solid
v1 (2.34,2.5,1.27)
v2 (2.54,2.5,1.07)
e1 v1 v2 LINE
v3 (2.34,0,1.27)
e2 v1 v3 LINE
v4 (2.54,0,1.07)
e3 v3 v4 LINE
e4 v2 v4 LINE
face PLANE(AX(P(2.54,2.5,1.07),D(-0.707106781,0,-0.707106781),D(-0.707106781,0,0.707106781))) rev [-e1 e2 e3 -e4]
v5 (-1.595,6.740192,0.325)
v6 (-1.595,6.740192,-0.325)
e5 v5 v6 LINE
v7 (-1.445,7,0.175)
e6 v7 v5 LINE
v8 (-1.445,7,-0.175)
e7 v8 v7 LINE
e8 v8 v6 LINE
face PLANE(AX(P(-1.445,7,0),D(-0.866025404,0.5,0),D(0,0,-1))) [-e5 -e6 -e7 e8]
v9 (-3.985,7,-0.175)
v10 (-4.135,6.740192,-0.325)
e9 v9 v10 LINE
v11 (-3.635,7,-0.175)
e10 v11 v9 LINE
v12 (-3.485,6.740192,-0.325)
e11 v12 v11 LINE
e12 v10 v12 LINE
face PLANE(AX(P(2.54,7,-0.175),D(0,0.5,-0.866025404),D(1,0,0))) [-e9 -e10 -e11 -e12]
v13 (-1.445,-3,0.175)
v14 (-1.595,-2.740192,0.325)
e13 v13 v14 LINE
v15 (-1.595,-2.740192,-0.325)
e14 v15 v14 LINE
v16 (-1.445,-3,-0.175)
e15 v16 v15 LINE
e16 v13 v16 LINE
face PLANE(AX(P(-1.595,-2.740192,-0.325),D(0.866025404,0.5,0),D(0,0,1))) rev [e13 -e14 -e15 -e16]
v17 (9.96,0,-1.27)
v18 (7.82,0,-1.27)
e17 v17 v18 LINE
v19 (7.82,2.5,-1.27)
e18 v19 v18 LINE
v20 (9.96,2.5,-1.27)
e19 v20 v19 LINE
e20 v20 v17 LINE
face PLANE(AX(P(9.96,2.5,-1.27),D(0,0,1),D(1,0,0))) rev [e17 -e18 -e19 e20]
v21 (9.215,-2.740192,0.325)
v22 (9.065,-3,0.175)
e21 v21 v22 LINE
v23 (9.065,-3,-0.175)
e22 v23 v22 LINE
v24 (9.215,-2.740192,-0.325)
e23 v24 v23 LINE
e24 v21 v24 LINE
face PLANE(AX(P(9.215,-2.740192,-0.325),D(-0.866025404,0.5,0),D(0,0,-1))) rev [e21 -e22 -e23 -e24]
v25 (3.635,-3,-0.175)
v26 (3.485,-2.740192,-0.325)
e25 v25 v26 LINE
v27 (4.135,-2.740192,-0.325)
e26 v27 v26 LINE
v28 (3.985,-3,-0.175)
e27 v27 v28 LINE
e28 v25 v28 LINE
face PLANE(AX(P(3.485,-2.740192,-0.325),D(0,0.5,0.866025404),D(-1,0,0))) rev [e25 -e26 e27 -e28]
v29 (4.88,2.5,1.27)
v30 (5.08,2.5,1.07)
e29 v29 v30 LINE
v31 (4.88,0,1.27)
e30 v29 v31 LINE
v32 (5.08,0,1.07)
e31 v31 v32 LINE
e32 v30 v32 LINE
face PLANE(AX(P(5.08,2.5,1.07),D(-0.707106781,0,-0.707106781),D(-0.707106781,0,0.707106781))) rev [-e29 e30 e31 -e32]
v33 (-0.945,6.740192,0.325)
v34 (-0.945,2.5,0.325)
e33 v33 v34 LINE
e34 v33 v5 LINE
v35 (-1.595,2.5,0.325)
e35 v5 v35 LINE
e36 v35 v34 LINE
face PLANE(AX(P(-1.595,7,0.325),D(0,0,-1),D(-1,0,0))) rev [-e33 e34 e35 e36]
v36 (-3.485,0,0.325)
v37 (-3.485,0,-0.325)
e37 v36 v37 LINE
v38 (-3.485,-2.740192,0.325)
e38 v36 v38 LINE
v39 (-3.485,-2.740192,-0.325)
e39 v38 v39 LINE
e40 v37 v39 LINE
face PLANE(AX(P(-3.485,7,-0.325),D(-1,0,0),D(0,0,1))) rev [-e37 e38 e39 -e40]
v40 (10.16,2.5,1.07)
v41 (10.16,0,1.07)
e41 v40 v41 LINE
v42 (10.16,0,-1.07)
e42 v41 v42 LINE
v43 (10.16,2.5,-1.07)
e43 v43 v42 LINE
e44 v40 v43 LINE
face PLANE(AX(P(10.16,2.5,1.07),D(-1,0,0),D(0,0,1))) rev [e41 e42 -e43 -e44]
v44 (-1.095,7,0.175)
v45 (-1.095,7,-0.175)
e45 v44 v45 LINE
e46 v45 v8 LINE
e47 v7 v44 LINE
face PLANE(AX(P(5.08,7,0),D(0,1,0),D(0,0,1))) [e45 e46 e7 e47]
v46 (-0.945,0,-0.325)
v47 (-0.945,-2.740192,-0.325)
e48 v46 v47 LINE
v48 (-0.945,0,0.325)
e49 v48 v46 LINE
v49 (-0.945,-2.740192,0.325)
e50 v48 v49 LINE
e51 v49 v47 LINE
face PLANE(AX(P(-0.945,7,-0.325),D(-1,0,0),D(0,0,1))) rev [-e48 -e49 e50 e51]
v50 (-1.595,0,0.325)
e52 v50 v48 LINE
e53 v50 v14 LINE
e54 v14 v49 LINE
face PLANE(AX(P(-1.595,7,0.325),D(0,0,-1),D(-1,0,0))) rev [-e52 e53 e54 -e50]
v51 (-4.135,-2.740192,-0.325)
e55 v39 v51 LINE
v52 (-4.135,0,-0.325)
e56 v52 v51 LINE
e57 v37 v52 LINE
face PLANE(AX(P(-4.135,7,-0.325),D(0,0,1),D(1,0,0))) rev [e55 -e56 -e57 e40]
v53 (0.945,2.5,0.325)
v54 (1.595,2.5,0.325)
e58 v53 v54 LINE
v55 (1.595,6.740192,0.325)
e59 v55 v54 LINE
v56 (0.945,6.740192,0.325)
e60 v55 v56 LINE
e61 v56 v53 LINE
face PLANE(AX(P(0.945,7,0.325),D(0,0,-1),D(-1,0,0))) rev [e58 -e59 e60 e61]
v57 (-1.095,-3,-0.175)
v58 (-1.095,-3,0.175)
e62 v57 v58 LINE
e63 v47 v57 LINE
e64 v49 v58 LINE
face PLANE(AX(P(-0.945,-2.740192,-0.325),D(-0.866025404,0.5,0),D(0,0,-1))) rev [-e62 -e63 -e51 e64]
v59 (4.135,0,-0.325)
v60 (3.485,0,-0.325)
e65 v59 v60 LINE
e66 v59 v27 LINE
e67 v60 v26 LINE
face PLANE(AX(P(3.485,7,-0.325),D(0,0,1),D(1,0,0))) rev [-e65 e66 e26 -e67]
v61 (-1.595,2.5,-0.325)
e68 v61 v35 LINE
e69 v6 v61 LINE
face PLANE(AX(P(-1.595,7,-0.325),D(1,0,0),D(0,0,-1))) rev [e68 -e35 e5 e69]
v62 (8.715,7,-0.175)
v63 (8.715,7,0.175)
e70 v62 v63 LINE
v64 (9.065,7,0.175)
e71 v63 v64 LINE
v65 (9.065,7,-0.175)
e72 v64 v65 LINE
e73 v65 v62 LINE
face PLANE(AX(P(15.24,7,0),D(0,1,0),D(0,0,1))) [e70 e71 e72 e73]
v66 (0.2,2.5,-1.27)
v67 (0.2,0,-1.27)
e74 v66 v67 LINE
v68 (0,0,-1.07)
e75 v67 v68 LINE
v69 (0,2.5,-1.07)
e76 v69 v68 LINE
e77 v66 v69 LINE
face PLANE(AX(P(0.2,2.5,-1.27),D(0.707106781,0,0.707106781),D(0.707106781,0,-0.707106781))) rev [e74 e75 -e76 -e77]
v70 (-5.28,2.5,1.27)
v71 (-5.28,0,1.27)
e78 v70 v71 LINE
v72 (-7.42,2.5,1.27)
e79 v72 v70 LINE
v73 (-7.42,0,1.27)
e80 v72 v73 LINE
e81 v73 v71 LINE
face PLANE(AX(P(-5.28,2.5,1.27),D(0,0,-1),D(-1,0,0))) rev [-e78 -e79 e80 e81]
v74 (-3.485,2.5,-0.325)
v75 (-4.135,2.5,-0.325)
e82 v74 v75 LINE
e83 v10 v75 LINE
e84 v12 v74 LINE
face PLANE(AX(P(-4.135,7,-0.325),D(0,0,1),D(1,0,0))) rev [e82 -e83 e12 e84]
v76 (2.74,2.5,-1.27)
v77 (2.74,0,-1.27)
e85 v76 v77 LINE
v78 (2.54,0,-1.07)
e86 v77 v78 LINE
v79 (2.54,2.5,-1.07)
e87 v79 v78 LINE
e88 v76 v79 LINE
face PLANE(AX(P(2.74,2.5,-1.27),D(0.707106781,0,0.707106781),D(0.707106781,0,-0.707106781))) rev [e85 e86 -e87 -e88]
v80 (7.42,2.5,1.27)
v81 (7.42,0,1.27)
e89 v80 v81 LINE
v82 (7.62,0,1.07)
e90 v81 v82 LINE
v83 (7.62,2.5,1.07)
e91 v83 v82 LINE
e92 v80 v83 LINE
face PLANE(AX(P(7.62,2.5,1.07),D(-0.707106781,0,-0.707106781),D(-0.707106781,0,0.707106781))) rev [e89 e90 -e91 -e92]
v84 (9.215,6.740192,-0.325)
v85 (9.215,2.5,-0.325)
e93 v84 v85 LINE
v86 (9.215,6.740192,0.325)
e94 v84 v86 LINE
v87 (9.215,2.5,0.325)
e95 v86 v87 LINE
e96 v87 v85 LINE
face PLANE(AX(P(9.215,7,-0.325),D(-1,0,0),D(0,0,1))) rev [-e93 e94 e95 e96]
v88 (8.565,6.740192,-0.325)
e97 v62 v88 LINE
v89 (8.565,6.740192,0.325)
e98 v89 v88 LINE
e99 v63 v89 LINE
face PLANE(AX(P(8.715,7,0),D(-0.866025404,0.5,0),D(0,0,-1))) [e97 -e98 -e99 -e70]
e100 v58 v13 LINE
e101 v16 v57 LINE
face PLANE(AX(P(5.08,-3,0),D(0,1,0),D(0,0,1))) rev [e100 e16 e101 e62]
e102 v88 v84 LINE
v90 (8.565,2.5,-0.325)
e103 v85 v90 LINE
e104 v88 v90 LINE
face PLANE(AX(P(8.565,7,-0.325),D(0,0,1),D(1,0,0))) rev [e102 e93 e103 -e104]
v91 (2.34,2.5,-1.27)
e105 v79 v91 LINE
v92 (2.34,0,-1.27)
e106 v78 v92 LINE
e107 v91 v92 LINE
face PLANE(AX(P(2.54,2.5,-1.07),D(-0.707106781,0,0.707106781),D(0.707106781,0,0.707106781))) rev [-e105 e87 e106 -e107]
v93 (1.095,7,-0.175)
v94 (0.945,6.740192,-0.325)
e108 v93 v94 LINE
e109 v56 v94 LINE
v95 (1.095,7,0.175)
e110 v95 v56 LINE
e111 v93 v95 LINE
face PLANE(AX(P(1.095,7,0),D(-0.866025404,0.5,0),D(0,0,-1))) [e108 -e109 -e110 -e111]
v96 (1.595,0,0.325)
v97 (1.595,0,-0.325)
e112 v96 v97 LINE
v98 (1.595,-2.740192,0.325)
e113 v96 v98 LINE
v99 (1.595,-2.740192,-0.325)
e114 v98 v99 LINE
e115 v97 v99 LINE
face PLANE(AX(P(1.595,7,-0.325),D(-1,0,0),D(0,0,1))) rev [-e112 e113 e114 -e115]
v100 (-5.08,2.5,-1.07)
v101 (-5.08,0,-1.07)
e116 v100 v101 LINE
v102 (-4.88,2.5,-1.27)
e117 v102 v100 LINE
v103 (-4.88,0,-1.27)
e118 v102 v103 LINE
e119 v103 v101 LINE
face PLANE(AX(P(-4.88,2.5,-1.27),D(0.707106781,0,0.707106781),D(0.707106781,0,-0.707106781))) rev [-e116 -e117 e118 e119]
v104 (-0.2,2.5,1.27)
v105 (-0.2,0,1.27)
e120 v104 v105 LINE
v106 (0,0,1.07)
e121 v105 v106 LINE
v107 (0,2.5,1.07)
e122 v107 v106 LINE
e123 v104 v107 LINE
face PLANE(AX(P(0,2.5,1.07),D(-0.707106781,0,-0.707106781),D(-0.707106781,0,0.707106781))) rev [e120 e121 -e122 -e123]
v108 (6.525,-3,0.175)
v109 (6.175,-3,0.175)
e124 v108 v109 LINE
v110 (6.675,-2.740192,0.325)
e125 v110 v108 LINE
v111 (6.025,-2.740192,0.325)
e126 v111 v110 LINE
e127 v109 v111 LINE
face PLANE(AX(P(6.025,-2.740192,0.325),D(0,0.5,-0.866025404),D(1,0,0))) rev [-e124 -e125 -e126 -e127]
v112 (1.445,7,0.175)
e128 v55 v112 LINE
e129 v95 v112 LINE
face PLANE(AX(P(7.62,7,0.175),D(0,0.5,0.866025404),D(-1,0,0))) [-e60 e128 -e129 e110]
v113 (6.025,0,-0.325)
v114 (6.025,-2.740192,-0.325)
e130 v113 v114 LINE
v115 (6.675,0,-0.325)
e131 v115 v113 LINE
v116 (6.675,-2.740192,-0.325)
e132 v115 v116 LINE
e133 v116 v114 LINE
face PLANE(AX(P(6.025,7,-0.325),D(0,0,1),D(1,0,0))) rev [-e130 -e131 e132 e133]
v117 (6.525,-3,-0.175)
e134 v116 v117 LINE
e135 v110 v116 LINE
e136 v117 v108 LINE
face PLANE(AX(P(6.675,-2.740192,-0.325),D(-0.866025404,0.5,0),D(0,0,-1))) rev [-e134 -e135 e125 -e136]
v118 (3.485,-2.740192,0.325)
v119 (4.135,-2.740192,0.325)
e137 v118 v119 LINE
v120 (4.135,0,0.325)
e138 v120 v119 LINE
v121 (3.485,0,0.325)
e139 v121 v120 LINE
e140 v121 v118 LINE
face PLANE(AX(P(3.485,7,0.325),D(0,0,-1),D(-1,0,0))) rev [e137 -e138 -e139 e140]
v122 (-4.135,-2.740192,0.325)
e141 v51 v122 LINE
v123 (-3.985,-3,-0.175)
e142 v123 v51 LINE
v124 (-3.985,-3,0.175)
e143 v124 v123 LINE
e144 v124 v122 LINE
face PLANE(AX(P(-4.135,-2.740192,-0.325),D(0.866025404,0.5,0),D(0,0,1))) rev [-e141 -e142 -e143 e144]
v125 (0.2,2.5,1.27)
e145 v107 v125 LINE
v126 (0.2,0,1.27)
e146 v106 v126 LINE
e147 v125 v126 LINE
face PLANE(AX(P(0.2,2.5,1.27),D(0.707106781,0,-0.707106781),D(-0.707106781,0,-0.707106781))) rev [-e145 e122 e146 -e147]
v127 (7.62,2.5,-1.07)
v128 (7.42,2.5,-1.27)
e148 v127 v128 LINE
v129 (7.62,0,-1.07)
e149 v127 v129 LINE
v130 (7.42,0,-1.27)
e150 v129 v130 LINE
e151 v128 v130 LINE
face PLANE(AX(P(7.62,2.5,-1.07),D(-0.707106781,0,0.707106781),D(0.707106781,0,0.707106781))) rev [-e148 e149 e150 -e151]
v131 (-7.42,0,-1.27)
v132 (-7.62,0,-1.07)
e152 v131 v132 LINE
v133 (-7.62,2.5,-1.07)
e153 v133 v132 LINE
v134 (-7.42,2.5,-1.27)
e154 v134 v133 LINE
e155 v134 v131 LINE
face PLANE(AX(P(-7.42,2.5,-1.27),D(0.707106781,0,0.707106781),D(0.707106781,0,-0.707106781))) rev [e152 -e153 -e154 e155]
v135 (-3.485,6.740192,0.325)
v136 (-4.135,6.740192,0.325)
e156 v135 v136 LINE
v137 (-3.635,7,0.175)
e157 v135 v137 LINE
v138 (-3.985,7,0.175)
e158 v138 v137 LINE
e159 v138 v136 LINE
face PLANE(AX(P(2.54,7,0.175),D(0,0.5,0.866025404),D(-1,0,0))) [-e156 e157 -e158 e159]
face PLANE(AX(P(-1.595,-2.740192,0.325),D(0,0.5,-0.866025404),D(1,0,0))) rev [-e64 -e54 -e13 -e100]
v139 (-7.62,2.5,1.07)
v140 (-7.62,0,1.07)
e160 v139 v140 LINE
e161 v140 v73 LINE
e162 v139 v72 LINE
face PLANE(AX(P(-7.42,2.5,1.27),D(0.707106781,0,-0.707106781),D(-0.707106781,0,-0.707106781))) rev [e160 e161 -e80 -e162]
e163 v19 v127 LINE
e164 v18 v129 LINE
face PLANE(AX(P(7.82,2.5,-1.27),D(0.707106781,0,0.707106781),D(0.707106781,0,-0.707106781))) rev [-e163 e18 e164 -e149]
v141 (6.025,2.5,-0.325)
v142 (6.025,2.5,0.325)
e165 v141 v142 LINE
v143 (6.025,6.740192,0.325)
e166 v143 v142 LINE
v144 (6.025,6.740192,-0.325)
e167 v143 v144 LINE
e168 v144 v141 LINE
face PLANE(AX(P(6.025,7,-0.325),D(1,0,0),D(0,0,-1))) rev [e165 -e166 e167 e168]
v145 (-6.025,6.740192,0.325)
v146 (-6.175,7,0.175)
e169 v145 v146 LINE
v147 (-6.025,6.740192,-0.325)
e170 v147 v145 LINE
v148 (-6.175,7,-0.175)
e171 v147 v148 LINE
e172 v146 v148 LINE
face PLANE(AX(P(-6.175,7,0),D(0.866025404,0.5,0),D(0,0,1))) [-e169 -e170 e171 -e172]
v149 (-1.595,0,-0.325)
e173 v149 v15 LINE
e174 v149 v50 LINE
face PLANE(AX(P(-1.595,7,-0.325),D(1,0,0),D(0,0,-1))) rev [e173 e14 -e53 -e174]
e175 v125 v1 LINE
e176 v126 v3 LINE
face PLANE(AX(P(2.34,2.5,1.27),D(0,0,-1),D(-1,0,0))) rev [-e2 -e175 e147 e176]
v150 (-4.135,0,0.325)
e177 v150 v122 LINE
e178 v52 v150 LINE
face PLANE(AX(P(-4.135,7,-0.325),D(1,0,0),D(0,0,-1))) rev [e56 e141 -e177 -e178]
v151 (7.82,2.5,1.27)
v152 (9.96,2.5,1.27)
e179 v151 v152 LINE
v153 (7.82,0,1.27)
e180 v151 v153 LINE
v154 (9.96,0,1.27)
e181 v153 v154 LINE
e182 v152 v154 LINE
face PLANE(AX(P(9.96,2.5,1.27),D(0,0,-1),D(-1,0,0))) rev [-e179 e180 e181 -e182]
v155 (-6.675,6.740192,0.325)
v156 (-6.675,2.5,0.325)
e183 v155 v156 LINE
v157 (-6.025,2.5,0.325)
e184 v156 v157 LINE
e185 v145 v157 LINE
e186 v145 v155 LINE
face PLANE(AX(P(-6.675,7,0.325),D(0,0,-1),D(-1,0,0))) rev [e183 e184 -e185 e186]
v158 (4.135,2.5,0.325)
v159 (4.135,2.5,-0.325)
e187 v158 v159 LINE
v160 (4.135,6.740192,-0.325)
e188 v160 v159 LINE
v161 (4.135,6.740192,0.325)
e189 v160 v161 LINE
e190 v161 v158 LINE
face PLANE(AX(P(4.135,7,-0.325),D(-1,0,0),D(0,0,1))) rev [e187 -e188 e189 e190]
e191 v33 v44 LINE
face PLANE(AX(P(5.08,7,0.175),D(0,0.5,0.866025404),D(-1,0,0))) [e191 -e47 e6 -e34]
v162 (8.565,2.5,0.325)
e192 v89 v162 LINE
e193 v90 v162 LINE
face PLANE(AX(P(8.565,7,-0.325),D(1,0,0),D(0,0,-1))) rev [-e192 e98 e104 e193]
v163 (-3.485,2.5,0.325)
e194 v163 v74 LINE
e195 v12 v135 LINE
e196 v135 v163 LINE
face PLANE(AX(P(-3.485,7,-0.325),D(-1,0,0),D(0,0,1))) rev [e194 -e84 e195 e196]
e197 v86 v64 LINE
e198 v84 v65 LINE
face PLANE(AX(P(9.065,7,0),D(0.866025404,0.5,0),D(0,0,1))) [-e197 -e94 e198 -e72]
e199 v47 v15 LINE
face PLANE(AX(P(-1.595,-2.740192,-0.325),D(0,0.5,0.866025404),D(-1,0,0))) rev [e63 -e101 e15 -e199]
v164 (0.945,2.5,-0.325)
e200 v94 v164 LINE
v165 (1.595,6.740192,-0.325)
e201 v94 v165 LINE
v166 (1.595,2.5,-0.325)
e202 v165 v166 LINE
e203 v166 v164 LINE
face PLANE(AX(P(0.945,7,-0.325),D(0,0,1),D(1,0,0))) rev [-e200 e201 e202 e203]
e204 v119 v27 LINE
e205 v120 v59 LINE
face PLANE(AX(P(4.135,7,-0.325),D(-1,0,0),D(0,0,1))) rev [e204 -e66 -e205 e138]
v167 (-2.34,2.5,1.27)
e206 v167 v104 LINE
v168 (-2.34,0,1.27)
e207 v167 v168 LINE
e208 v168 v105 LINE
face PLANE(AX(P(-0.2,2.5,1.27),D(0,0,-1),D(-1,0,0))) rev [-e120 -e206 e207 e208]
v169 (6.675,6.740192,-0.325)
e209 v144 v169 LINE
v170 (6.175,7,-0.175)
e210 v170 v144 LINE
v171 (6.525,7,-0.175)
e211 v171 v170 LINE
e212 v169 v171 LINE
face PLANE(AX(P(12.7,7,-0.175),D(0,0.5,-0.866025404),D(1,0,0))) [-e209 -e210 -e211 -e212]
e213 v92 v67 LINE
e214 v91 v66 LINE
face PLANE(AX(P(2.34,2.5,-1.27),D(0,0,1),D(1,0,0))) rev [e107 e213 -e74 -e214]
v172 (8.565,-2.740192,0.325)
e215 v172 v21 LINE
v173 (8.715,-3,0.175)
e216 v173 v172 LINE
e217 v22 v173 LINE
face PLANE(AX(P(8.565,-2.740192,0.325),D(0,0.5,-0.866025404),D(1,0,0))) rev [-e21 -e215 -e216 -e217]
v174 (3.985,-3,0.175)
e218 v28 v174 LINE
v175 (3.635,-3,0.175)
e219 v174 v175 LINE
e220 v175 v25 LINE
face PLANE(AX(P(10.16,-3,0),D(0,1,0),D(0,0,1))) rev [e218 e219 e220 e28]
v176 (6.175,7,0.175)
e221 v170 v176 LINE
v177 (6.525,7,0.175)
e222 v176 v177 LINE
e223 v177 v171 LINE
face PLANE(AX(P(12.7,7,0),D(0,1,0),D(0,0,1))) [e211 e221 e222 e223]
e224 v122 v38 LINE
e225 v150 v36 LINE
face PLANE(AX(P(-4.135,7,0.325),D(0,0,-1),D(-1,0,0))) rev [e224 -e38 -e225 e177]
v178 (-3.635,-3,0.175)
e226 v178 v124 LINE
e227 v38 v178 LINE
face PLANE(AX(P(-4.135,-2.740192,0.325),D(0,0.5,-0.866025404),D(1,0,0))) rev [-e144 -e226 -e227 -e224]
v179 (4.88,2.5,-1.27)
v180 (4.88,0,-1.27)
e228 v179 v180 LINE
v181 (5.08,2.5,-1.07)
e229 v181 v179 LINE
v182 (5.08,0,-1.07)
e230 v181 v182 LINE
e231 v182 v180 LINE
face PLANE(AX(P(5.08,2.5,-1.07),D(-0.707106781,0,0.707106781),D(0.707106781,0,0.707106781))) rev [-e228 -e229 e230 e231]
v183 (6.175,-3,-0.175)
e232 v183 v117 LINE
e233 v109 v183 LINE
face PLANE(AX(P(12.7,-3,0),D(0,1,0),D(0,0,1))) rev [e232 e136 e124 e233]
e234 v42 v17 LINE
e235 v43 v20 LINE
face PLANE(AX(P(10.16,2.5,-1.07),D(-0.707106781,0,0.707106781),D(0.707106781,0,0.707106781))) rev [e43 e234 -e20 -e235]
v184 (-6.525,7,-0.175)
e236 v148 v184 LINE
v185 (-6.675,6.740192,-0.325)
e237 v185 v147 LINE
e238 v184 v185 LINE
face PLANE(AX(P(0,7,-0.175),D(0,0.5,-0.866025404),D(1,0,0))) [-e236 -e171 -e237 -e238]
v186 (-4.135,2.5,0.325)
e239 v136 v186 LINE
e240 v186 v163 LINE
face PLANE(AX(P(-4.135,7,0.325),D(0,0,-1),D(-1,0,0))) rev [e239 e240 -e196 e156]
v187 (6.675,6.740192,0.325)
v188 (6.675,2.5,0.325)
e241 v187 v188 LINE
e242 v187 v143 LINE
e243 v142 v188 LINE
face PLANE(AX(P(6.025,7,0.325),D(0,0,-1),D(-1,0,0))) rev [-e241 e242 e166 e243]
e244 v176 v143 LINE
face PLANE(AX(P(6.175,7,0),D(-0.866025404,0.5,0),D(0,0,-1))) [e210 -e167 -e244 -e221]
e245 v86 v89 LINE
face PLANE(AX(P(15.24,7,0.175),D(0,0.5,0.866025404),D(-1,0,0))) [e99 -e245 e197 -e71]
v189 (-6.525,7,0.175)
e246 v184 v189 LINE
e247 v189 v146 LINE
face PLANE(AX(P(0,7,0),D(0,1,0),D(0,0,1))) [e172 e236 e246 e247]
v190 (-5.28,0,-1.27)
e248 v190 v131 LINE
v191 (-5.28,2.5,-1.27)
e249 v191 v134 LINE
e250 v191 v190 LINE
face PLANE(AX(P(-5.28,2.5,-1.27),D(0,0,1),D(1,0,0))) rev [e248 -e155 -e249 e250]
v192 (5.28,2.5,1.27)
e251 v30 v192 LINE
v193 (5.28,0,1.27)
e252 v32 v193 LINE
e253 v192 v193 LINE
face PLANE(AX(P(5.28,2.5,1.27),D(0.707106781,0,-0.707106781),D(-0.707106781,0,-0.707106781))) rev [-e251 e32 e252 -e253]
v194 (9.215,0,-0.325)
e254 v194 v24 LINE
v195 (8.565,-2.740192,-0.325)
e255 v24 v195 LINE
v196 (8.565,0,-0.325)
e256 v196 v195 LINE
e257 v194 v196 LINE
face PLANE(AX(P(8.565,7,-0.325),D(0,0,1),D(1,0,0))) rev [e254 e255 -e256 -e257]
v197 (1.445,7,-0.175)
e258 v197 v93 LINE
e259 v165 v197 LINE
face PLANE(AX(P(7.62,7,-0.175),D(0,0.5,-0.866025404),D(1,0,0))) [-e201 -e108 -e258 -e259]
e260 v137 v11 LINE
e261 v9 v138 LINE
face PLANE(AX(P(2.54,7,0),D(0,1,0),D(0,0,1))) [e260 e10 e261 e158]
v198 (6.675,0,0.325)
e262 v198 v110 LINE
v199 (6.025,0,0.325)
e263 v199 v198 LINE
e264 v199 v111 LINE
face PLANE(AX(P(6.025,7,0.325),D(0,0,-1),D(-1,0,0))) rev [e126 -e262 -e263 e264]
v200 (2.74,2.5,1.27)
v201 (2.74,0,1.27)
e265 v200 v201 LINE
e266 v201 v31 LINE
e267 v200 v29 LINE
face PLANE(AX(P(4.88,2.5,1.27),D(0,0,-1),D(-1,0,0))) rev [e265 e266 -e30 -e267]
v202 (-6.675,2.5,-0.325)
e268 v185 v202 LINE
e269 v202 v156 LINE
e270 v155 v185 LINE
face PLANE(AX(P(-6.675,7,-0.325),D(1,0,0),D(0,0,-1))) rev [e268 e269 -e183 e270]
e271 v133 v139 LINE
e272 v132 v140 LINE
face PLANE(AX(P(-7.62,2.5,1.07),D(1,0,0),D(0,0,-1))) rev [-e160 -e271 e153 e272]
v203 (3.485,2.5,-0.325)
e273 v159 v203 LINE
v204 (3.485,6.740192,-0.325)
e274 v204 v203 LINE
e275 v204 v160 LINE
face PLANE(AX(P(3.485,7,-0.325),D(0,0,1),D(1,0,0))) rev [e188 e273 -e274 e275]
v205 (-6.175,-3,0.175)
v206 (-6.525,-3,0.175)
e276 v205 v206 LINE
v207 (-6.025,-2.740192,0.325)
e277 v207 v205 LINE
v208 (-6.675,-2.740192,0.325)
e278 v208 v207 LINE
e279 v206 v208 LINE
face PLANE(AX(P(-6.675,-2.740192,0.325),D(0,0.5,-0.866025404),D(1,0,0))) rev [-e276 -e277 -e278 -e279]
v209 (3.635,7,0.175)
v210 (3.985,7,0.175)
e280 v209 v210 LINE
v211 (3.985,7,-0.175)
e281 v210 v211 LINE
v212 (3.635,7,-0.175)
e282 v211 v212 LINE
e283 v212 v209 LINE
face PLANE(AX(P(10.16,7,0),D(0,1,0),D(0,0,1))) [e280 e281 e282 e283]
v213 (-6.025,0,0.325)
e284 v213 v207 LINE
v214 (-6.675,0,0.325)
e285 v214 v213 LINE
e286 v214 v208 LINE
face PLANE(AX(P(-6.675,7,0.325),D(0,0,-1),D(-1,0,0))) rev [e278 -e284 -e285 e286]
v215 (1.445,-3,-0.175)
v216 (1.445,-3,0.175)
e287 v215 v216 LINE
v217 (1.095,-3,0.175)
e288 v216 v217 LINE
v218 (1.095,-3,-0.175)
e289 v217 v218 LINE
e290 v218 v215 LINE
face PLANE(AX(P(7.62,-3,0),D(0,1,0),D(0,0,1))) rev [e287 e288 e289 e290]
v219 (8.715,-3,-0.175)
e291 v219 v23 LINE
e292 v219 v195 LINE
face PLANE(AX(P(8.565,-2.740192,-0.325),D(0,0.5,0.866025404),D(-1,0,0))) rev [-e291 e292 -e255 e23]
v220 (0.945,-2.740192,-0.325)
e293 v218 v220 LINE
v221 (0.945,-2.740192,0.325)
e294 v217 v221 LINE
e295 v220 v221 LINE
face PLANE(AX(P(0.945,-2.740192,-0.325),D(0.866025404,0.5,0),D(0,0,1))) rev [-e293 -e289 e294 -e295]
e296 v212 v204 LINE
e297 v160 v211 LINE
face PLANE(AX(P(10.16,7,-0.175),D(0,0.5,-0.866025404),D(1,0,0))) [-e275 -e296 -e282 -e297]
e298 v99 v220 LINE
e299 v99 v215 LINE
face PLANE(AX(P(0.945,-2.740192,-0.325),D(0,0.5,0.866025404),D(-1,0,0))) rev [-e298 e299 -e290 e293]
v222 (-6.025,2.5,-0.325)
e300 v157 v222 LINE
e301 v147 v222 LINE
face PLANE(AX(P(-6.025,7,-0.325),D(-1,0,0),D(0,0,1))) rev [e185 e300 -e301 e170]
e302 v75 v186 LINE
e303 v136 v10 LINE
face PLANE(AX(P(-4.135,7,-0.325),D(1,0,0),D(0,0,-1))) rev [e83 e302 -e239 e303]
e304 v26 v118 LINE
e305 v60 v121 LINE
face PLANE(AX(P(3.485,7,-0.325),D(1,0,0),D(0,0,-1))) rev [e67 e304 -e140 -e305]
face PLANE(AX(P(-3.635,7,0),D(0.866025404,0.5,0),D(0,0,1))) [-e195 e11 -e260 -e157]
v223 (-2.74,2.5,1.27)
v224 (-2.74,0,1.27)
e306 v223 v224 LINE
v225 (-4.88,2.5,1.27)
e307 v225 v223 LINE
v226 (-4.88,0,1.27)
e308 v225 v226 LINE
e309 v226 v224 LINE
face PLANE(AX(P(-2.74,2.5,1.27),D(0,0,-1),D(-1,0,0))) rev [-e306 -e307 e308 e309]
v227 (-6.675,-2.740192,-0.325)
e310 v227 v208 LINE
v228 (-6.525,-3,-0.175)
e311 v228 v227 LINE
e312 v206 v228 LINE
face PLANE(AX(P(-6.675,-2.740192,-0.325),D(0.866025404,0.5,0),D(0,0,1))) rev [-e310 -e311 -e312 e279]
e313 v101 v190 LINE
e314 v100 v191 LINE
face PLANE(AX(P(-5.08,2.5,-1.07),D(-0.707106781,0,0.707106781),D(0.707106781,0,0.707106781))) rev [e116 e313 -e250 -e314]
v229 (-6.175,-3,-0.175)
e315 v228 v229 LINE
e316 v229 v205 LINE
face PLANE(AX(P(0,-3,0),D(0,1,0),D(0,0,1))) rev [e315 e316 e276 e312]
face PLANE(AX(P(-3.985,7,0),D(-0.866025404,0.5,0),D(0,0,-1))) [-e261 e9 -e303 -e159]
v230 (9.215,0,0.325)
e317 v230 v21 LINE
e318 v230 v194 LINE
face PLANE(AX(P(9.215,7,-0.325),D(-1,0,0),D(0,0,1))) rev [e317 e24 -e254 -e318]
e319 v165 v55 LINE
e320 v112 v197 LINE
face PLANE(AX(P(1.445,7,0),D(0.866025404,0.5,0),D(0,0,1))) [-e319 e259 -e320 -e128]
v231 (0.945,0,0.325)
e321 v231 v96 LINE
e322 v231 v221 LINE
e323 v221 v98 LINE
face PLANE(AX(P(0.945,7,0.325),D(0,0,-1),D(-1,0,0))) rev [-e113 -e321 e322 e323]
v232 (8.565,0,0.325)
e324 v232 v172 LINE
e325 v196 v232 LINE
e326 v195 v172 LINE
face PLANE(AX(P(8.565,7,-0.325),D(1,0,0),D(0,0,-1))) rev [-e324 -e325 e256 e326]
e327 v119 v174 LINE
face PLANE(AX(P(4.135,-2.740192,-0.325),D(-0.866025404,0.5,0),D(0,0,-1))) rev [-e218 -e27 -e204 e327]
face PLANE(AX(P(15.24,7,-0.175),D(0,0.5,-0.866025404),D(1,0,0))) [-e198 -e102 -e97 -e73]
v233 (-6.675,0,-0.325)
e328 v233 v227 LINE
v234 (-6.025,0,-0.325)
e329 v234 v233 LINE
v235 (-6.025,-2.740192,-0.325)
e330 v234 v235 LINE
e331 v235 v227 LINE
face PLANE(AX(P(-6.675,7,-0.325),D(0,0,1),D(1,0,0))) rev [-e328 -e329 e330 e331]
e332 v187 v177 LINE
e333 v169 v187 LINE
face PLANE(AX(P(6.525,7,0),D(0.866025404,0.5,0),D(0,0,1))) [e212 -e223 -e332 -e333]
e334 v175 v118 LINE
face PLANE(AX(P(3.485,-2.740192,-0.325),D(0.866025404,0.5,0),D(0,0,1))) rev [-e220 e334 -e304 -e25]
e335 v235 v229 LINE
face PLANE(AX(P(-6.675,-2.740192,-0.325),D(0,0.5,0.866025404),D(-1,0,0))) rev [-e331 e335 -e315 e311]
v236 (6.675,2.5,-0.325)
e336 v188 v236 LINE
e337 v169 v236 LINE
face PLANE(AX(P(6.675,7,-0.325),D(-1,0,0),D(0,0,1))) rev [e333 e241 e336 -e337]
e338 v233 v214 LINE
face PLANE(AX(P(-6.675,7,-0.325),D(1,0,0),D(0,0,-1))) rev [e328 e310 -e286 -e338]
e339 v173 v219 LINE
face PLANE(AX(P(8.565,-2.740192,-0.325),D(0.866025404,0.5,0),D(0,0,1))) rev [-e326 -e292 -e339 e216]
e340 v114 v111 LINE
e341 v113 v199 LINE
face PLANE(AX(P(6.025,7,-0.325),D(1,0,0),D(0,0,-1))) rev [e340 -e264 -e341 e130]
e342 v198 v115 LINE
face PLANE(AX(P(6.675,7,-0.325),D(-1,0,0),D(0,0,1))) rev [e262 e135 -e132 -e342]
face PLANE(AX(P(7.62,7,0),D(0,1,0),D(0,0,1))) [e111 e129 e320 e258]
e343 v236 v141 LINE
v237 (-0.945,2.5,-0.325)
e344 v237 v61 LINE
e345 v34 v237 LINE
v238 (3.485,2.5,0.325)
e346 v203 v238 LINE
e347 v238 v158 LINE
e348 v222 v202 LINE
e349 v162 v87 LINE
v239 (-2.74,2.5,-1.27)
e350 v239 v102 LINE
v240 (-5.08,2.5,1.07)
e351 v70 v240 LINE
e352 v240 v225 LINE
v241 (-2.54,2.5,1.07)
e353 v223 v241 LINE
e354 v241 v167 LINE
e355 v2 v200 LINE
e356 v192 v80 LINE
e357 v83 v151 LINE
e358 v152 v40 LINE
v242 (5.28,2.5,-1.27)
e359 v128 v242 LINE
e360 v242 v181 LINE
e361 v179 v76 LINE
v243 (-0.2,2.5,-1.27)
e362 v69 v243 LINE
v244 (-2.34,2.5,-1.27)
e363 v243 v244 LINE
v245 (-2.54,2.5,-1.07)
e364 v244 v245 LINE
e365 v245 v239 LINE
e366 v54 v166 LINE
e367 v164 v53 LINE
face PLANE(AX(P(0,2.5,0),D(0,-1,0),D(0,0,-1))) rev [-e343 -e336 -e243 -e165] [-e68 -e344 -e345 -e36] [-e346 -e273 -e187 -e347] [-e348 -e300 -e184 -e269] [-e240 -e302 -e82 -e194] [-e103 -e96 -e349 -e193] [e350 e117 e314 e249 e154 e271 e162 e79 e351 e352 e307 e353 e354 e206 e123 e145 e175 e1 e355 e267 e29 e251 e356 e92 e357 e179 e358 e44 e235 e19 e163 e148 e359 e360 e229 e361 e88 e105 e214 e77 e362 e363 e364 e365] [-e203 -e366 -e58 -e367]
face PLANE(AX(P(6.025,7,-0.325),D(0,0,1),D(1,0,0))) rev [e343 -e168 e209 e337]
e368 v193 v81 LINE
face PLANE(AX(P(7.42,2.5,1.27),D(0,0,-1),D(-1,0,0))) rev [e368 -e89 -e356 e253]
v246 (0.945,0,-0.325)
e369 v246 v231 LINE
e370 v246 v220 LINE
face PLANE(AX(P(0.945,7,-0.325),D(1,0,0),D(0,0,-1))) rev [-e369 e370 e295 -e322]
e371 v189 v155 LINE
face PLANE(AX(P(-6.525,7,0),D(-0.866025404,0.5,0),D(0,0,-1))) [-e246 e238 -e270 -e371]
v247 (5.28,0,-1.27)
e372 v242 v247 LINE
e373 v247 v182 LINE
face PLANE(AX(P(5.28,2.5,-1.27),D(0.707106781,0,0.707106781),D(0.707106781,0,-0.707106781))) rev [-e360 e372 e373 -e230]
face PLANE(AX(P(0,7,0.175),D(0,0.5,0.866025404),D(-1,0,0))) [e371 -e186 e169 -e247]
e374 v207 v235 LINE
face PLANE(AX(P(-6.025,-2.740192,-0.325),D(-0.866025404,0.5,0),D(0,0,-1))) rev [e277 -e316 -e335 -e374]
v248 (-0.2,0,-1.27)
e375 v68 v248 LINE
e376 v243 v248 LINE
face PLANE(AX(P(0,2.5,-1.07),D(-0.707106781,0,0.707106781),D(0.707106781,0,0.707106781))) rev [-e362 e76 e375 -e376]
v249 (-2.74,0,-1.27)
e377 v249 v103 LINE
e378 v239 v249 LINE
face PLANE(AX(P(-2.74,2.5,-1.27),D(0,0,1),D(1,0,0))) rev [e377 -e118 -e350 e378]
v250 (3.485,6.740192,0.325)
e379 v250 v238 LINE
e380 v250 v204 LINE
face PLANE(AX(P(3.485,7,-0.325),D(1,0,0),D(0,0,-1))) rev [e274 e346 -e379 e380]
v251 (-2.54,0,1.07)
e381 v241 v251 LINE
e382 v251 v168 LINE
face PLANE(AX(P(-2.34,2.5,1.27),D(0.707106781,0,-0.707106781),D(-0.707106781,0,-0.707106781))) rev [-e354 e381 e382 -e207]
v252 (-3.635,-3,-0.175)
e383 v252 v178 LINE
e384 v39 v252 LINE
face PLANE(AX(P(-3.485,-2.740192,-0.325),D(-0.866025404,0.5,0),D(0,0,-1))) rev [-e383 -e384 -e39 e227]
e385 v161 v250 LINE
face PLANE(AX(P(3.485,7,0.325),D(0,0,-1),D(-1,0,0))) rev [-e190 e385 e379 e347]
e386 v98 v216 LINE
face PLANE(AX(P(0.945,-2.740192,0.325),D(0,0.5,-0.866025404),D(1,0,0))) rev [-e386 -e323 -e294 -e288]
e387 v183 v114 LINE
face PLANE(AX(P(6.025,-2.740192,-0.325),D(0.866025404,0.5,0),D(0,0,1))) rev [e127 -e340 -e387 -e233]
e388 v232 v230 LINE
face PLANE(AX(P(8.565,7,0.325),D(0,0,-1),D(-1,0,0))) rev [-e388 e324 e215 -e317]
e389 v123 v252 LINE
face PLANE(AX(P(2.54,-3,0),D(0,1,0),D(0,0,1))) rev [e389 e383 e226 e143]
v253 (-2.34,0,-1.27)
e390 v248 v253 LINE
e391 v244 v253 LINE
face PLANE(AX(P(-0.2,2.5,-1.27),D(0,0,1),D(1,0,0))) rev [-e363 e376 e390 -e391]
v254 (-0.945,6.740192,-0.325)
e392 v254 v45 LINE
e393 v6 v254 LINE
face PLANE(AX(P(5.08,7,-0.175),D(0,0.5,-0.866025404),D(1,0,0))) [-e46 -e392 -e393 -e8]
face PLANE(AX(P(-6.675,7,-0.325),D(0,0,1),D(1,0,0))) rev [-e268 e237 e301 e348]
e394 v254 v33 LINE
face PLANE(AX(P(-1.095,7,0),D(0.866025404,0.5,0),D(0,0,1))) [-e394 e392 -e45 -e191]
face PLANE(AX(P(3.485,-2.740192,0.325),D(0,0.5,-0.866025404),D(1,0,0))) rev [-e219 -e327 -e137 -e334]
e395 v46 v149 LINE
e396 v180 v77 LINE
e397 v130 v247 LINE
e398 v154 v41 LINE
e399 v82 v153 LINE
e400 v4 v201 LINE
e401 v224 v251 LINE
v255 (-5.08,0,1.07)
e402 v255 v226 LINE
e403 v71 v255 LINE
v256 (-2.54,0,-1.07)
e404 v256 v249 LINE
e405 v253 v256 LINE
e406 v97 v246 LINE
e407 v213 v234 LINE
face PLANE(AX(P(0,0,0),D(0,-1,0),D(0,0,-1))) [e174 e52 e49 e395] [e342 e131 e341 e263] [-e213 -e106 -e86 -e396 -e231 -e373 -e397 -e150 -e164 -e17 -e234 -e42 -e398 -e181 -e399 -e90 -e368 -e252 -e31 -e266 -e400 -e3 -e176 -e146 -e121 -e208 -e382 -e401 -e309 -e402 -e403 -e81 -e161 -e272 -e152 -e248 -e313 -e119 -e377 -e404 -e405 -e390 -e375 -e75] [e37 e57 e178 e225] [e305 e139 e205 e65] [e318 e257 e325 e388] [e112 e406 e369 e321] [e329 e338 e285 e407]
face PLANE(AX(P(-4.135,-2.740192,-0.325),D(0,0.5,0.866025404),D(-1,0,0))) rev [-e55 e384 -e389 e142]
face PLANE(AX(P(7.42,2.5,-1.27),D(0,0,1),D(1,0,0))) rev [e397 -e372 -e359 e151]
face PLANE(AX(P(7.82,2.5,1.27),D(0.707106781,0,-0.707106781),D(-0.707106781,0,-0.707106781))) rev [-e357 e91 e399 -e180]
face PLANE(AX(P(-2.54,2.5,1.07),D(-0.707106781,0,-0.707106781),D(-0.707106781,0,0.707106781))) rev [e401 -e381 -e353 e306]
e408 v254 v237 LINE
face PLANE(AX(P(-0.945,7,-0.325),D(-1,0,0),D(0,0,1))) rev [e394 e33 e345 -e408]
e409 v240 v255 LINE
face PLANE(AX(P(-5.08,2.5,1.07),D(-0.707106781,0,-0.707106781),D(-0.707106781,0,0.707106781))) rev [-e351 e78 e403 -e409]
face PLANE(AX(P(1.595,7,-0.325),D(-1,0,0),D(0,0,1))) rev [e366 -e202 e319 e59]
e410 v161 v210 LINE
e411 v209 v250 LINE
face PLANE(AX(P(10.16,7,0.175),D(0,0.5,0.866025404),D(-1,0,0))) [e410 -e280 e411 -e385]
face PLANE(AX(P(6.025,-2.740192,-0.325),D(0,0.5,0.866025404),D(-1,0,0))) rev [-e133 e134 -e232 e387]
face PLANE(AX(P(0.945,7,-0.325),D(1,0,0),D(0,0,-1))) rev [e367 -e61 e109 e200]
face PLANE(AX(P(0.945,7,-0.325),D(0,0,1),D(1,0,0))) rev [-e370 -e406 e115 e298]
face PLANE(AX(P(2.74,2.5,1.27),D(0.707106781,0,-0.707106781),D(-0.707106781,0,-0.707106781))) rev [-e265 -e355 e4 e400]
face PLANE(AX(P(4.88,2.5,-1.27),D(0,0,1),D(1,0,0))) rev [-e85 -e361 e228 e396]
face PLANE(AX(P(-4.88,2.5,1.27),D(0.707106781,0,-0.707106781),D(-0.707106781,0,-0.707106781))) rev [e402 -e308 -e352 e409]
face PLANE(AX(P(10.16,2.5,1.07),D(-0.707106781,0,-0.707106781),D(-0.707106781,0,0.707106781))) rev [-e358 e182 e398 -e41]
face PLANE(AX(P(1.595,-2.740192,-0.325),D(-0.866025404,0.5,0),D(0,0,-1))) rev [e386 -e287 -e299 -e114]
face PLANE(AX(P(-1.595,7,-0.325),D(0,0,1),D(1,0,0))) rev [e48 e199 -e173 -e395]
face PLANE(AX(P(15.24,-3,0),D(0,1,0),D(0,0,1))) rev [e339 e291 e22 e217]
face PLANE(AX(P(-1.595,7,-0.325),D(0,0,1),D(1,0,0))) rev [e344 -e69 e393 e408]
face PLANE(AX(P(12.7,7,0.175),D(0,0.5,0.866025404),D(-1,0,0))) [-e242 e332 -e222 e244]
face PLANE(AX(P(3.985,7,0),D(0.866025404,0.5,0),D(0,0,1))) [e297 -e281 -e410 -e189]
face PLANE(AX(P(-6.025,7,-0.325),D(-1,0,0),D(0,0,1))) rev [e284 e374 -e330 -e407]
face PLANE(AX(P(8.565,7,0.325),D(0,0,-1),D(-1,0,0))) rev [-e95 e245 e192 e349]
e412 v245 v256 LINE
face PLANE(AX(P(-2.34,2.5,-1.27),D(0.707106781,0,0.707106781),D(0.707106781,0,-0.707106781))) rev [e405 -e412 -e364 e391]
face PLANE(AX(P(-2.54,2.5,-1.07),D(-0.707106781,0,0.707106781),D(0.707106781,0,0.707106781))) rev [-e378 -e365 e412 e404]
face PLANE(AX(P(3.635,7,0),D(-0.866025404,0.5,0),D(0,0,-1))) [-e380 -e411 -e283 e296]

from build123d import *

# Parameters (mm, degrees)
BOSS_EXTRUDE1_DEPTH   = 2.5
SKETCH3_W             = 0.65
SKETCH3_H             = 0.65
BOSS_EXTRUDE2_DEPTH   = 10
CHAMFER2_SIZE         = 0.15
CHAMFER2_SIZE2        = 0.259807621
CHAMFER3_SIZE         = 0.15
CHAMFER3_SIZE2        = 0.259807621
LPATTERN2_DEPTH       = 2.5
LPATTERN2_START       = -2.740192379
LPATTERN2_2_OUTLINE_W = 0.65
LPATTERN2_2_OUTLINE_H = 0.65
LPATTERN2_2_DEPTH     = 9.480384758


with BuildPart() as part:
    # Sketch1 → Boss-Extrude1 (new body)
    with BuildSketch(Plane(origin=(0, 0, 0), x_dir=(1, 0, 0), z_dir=(0, 1, 0))):
        Polygon((-7.42, 1.27), (-7.62, 1.07), (-7.62, -1.07), (-7.42, -1.27), (-5.28, -1.27), (-5.08, -1.07), (-5.08, 1.07), (-5.28, 1.27), align=None)
    extrude(amount=BOSS_EXTRUDE1_DEPTH)

    # Sketch3 → Boss-Extrude2 (add)
    with BuildSketch(Plane(origin=(0, -3, 0), x_dir=(1, 0, 0), z_dir=(0, 1, 0))):
        with Locations((-6.35, 0)):
            Rectangle(SKETCH3_W, SKETCH3_H)
    extrude(amount=BOSS_EXTRUDE2_DEPTH)

    # Chamfer2
    chamfer2_edges = [part.edges().sort_by_distance(p)[0] for p in [
        (-6.025, -3, 0),
        (-6.35, -3, -0.325),
        (-6.675, -3, 0),
        (-6.35, -3, 0.325),
    ]]
    chamfer2_side = [part.faces().sort_by_distance(p)[0] for p in [
        (-6.35, -3, 0),
    ]]
    chamfer(chamfer2_edges, length=CHAMFER2_SIZE, length2=CHAMFER2_SIZE2, reference=chamfer2_side[0])

    # Chamfer3
    chamfer3_edges = [part.edges().sort_by_distance(p)[0] for p in [
        (-6.025, 7, 0),
        (-6.35, 7, -0.325),
        (-6.675, 7, 0),
        (-6.35, 7, 0.325),
    ]]
    chamfer3_side = [part.faces().sort_by_distance(p)[0] for p in [
        (-6.35, 7, 0),
    ]]
    chamfer(chamfer3_edges, length=CHAMFER3_SIZE, length2=CHAMFER3_SIZE2, reference=chamfer3_side[0])

    # LPattern2: read off the stored shape, not the designer's step
    # LPattern2 outline → LPattern2 (add)
    with BuildSketch(Plane(origin=(0, 0, 0), x_dir=(1, 0, 0), z_dir=(0, 1, 0))):
        Polygon((-2.74, 1.27), (-4.88, 1.27), (-5.08, 1.07), (-5.08, -1.07), (-4.88, -1.27), (-2.74, -1.27), (-2.54, -1.07), (-2.34, -1.27), (-0.2, -1.27), (0, -1.07), (0.2, -1.27), (2.34, -1.27), (2.54, -1.07), (2.74, -1.27), (4.88, -1.27), (5.08, -1.07), (5.28, -1.27), (7.42, -1.27), (7.62, -1.07), (7.82, -1.27), (9.96, -1.27), (10.16, -1.07), (10.16, 1.07), (9.96, 1.27), (7.82, 1.27), (7.62, 1.07), (7.42, 1.27), (5.28, 1.27), (5.08, 1.07), (4.88, 1.27), (2.74, 1.27), (2.54, 1.07), (2.34, 1.27), (0.2, 1.27), (0, 1.07), (-0.2, 1.27), (-2.34, 1.27), (-2.54, 1.07), align=None)
    extrude(amount=LPATTERN2_DEPTH)

    # LPattern2 2 outline → LPattern2 2 (add)
    with BuildSketch(Plane(origin=(0, 0, 0), x_dir=(1, 0, 0), z_dir=(0, 1, 0)).offset(LPATTERN2_START)):
        with Locations((-3.81, 0)):
            Rectangle(LPATTERN2_2_OUTLINE_W, LPATTERN2_2_OUTLINE_H)
        with Locations((-1.27, 0)):
            Rectangle(LPATTERN2_2_OUTLINE_W, LPATTERN2_2_OUTLINE_H)
        with Locations((1.27, 0)):
            Rectangle(LPATTERN2_2_OUTLINE_W, LPATTERN2_2_OUTLINE_H)
        with Locations((3.81, 0)):
            Rectangle(LPATTERN2_2_OUTLINE_W, LPATTERN2_2_OUTLINE_H)
        with Locations((6.35, 0)):
            Rectangle(LPATTERN2_2_OUTLINE_W, LPATTERN2_2_OUTLINE_H)
        with Locations((8.89, 0)):
            Rectangle(LPATTERN2_2_OUTLINE_W, LPATTERN2_2_OUTLINE_H)
    extrude(amount=LPATTERN2_2_DEPTH)

    # LPattern2 3: loft between two sections, ruled curve by curve
    lpattern2_3_from = [
        Edge.make_line((-3.985, -3, 0.175), (-3.635, -3, 0.175)),
        Edge.make_line((-3.635, -3, -0.175), (-3.985, -3, -0.175)),
        Edge.make_line((-3.635, -3, 0.175), (-3.635, -3, -0.175)),
        Edge.make_line((-3.985, -3, 0.175), (-3.985, -3, -0.175)),
    ]
    lpattern2_3_to = [
        Edge.make_line((-4.135, -2.740192379, 0.325), (-3.485, -2.740192379, 0.325)),
        Edge.make_line((-3.485, -2.740192379, -0.325), (-4.135, -2.740192379, -0.325)),
        Edge.make_line((-3.485, -2.740192379, 0.325), (-3.485, -2.740192379, -0.325)),
        Edge.make_line((-4.135, -2.740192379, 0.325), (-4.135, -2.740192379, -0.325)),
    ]
    lpattern2_3 = Solid(Shell([*[Face.make_surface_from_curves(lpattern2_3_from[k], lpattern2_3_to[k]) for k in range(4)], Face(Wire(lpattern2_3_from)), Face(Wire(lpattern2_3_to))]))
    add(lpattern2_3)

    # LPattern2 4: loft between two sections, ruled curve by curve
    lpattern2_4_from = [
        Edge.make_line((-1.445, -3, 0.175), (-1.095, -3, 0.175)),
        Edge.make_line((-1.095, -3, -0.175), (-1.445, -3, -0.175)),
        Edge.make_line((-1.095, -3, 0.175), (-1.095, -3, -0.175)),
        Edge.make_line((-1.445, -3, 0.175), (-1.445, -3, -0.175)),
    ]
    lpattern2_4_to = [
        Edge.make_line((-1.595, -2.740192379, 0.325), (-0.945, -2.740192379, 0.325)),
        Edge.make_line((-0.945, -2.740192379, -0.325), (-1.595, -2.740192379, -0.325)),
        Edge.make_line((-0.945, -2.740192379, 0.325), (-0.945, -2.740192379, -0.325)),
        Edge.make_line((-1.595, -2.740192379, 0.325), (-1.595, -2.740192379, -0.325)),
    ]
    lpattern2_4 = Solid(Shell([*[Face.make_surface_from_curves(lpattern2_4_from[k], lpattern2_4_to[k]) for k in range(4)], Face(Wire(lpattern2_4_from)), Face(Wire(lpattern2_4_to))]))
    add(lpattern2_4)

    # LPattern2 5: loft between two sections, ruled curve by curve
    lpattern2_5_from = [
        Edge.make_line((1.095, -3, 0.175), (1.445, -3, 0.175)),
        Edge.make_line((1.445, -3, -0.175), (1.095, -3, -0.175)),
        Edge.make_line((1.445, -3, 0.175), (1.445, -3, -0.175)),
        Edge.make_line((1.095, -3, 0.175), (1.095, -3, -0.175)),
    ]
    lpattern2_5_to = [
        Edge.make_line((0.945, -2.740192379, 0.325), (1.595, -2.740192379, 0.325)),
        Edge.make_line((1.595, -2.740192379, -0.325), (0.945, -2.740192379, -0.325)),
        Edge.make_line((1.595, -2.740192379, 0.325), (1.595, -2.740192379, -0.325)),
        Edge.make_line((0.945, -2.740192379, 0.325), (0.945, -2.740192379, -0.325)),
    ]
    lpattern2_5 = Solid(Shell([*[Face.make_surface_from_curves(lpattern2_5_from[k], lpattern2_5_to[k]) for k in range(4)], Face(Wire(lpattern2_5_from)), Face(Wire(lpattern2_5_to))]))
    add(lpattern2_5)

    # LPattern2 6: loft between two sections, ruled curve by curve
    lpattern2_6_from = [
        Edge.make_line((3.635, -3, 0.175), (3.985, -3, 0.175)),
        Edge.make_line((3.985, -3, -0.175), (3.635, -3, -0.175)),
        Edge.make_line((3.985, -3, 0.175), (3.985, -3, -0.175)),
        Edge.make_line((3.635, -3, 0.175), (3.635, -3, -0.175)),
    ]
    lpattern2_6_to = [
        Edge.make_line((3.485, -2.740192379, 0.325), (4.135, -2.740192379, 0.325)),
        Edge.make_line((4.135, -2.740192379, -0.325), (3.485, -2.740192379, -0.325)),
        Edge.make_line((4.135, -2.740192379, 0.325), (4.135, -2.740192379, -0.325)),
        Edge.make_line((3.485, -2.740192379, 0.325), (3.485, -2.740192379, -0.325)),
    ]
    lpattern2_6 = Solid(Shell([*[Face.make_surface_from_curves(lpattern2_6_from[k], lpattern2_6_to[k]) for k in range(4)], Face(Wire(lpattern2_6_from)), Face(Wire(lpattern2_6_to))]))
    add(lpattern2_6)

    # LPattern2 7: loft between two sections, ruled curve by curve
    lpattern2_7_from = [
        Edge.make_line((6.175, -3, 0.175), (6.525, -3, 0.175)),
        Edge.make_line((6.525, -3, -0.175), (6.175, -3, -0.175)),
        Edge.make_line((6.525, -3, 0.175), (6.525, -3, -0.175)),
        Edge.make_line((6.175, -3, 0.175), (6.175, -3, -0.175)),
    ]
    lpattern2_7_to = [
        Edge.make_line((6.025, -2.740192379, 0.325), (6.675, -2.740192379, 0.325)),
        Edge.make_line((6.675, -2.740192379, -0.325), (6.025, -2.740192379, -0.325)),
        Edge.make_line((6.675, -2.740192379, 0.325), (6.675, -2.740192379, -0.325)),
        Edge.make_line((6.025, -2.740192379, 0.325), (6.025, -2.740192379, -0.325)),
    ]
    lpattern2_7 = Solid(Shell([*[Face.make_surface_from_curves(lpattern2_7_from[k], lpattern2_7_to[k]) for k in range(4)], Face(Wire(lpattern2_7_from)), Face(Wire(lpattern2_7_to))]))
    add(lpattern2_7)

    # LPattern2 8: loft between two sections, ruled curve by curve
    lpattern2_8_from = [
        Edge.make_line((8.715, -3, 0.175), (9.065, -3, 0.175)),
        Edge.make_line((9.065, -3, -0.175), (8.715, -3, -0.175)),
        Edge.make_line((9.065, -3, 0.175), (9.065, -3, -0.175)),
        Edge.make_line((8.715, -3, 0.175), (8.715, -3, -0.175)),
    ]
    lpattern2_8_to = [
        Edge.make_line((8.565, -2.740192379, 0.325), (9.215, -2.740192379, 0.325)),
        Edge.make_line((9.215, -2.740192379, -0.325), (8.565, -2.740192379, -0.325)),
        Edge.make_line((9.215, -2.740192379, 0.325), (9.215, -2.740192379, -0.325)),
        Edge.make_line((8.565, -2.740192379, 0.325), (8.565, -2.740192379, -0.325)),
    ]
    lpattern2_8 = Solid(Shell([*[Face.make_surface_from_curves(lpattern2_8_from[k], lpattern2_8_to[k]) for k in range(4)], Face(Wire(lpattern2_8_from)), Face(Wire(lpattern2_8_to))]))
    add(lpattern2_8)

    # LPattern2 9: loft between two sections, ruled curve by curve
    lpattern2_9_from = [
        Edge.make_line((-3.485, 6.740192379, -0.325), (-4.135, 6.740192379, -0.325)),
        Edge.make_line((-4.135, 6.740192379, 0.325), (-3.485, 6.740192379, 0.325)),
        Edge.make_line((-4.135, 6.740192379, -0.325), (-4.135, 6.740192379, 0.325)),
        Edge.make_line((-3.485, 6.740192379, -0.325), (-3.485, 6.740192379, 0.325)),
    ]
    lpattern2_9_to = [
        Edge.make_line((-3.635, 7, -0.175), (-3.985, 7, -0.175)),
        Edge.make_line((-3.985, 7, 0.175), (-3.635, 7, 0.175)),
        Edge.make_line((-3.985, 7, -0.175), (-3.985, 7, 0.175)),
        Edge.make_line((-3.635, 7, -0.175), (-3.635, 7, 0.175)),
    ]
    lpattern2_9 = Solid(Shell([*[Face.make_surface_from_curves(lpattern2_9_from[k], lpattern2_9_to[k]) for k in range(4)], Face(Wire(lpattern2_9_from)), Face(Wire(lpattern2_9_to))]))
    add(lpattern2_9)

    # LPattern2 10: loft between two sections, ruled curve by curve
    lpattern2_10_from = [
        Edge.make_line((-0.945, 6.740192379, -0.325), (-1.595, 6.740192379, -0.325)),
        Edge.make_line((-1.595, 6.740192379, 0.325), (-0.945, 6.740192379, 0.325)),
        Edge.make_line((-1.595, 6.740192379, -0.325), (-1.595, 6.740192379, 0.325)),
        Edge.make_line((-0.945, 6.740192379, -0.325), (-0.945, 6.740192379, 0.325)),
    ]
    lpattern2_10_to = [
        Edge.make_line((-1.095, 7, -0.175), (-1.445, 7, -0.175)),
        Edge.make_line((-1.445, 7, 0.175), (-1.095, 7, 0.175)),
        Edge.make_line((-1.445, 7, -0.175), (-1.445, 7, 0.175)),
        Edge.make_line((-1.095, 7, -0.175), (-1.095, 7, 0.175)),
    ]
    lpattern2_10 = Solid(Shell([*[Face.make_surface_from_curves(lpattern2_10_from[k], lpattern2_10_to[k]) for k in range(4)], Face(Wire(lpattern2_10_from)), Face(Wire(lpattern2_10_to))]))
    add(lpattern2_10)

    # LPattern2 11: loft between two sections, ruled curve by curve
    lpattern2_11_from = [
        Edge.make_line((1.595, 6.740192379, -0.325), (0.945, 6.740192379, -0.325)),
        Edge.make_line((0.945, 6.740192379, 0.325), (1.595, 6.740192379, 0.325)),
        Edge.make_line((0.945, 6.740192379, -0.325), (0.945, 6.740192379, 0.325)),
        Edge.make_line((1.595, 6.740192379, -0.325), (1.595, 6.740192379, 0.325)),
    ]
    lpattern2_11_to = [
        Edge.make_line((1.445, 7, -0.175), (1.095, 7, -0.175)),
        Edge.make_line((1.095, 7, 0.175), (1.445, 7, 0.175)),
        Edge.make_line((1.095, 7, -0.175), (1.095, 7, 0.175)),
        Edge.make_line((1.445, 7, -0.175), (1.445, 7, 0.175)),
    ]
    lpattern2_11 = Solid(Shell([*[Face.make_surface_from_curves(lpattern2_11_from[k], lpattern2_11_to[k]) for k in range(4)], Face(Wire(lpattern2_11_from)), Face(Wire(lpattern2_11_to))]))
    add(lpattern2_11)

    # LPattern2 12: loft between two sections, ruled curve by curve
    lpattern2_12_from = [
        Edge.make_line((4.135, 6.740192379, -0.325), (3.485, 6.740192379, -0.325)),
        Edge.make_line((3.485, 6.740192379, 0.325), (4.135, 6.740192379, 0.325)),
        Edge.make_line((3.485, 6.740192379, -0.325), (3.485, 6.740192379, 0.325)),
        Edge.make_line((4.135, 6.740192379, -0.325), (4.135, 6.740192379, 0.325)),
    ]
    lpattern2_12_to = [
        Edge.make_line((3.985, 7, -0.175), (3.635, 7, -0.175)),
        Edge.make_line((3.635, 7, 0.175), (3.985, 7, 0.175)),
        Edge.make_line((3.635, 7, -0.175), (3.635, 7, 0.175)),
        Edge.make_line((3.985, 7, -0.175), (3.985, 7, 0.175)),
    ]
    lpattern2_12 = Solid(Shell([*[Face.make_surface_from_curves(lpattern2_12_from[k], lpattern2_12_to[k]) for k in range(4)], Face(Wire(lpattern2_12_from)), Face(Wire(lpattern2_12_to))]))
    add(lpattern2_12)

    # LPattern2 13: loft between two sections, ruled curve by curve
    lpattern2_13_from = [
        Edge.make_line((6.675, 6.740192379, -0.325), (6.025, 6.740192379, -0.325)),
        Edge.make_line((6.025, 6.740192379, 0.325), (6.675, 6.740192379, 0.325)),
        Edge.make_line((6.025, 6.740192379, -0.325), (6.025, 6.740192379, 0.325)),
        Edge.make_line((6.675, 6.740192379, -0.325), (6.675, 6.740192379, 0.325)),
    ]
    lpattern2_13_to = [
        Edge.make_line((6.525, 7, -0.175), (6.175, 7, -0.175)),
        Edge.make_line((6.175, 7, 0.175), (6.525, 7, 0.175)),
        Edge.make_line((6.175, 7, -0.175), (6.175, 7, 0.175)),
        Edge.make_line((6.525, 7, -0.175), (6.525, 7, 0.175)),
    ]
    lpattern2_13 = Solid(Shell([*[Face.make_surface_from_curves(lpattern2_13_from[k], lpattern2_13_to[k]) for k in range(4)], Face(Wire(lpattern2_13_from)), Face(Wire(lpattern2_13_to))]))
    add(lpattern2_13)

    # LPattern2 14: loft between two sections, ruled curve by curve
    lpattern2_14_from = [
        Edge.make_line((9.215, 6.740192379, -0.325), (8.565, 6.740192379, -0.325)),
        Edge.make_line((8.565, 6.740192379, 0.325), (9.215, 6.740192379, 0.325)),
        Edge.make_line((8.565, 6.740192379, -0.325), (8.565, 6.740192379, 0.325)),
        Edge.make_line((9.215, 6.740192379, -0.325), (9.215, 6.740192379, 0.325)),
    ]
    lpattern2_14_to = [
        Edge.make_line((9.065, 7, -0.175), (8.715, 7, -0.175)),
        Edge.make_line((8.715, 7, 0.175), (9.065, 7, 0.175)),
        Edge.make_line((8.715, 7, -0.175), (8.715, 7, 0.175)),
        Edge.make_line((9.065, 7, -0.175), (9.065, 7, 0.175)),
    ]
    lpattern2_14 = Solid(Shell([*[Face.make_surface_from_curves(lpattern2_14_from[k], lpattern2_14_to[k]) for k in range(4)], Face(Wire(lpattern2_14_from)), Face(Wire(lpattern2_14_to))]))
    add(lpattern2_14)


solid = part.part
